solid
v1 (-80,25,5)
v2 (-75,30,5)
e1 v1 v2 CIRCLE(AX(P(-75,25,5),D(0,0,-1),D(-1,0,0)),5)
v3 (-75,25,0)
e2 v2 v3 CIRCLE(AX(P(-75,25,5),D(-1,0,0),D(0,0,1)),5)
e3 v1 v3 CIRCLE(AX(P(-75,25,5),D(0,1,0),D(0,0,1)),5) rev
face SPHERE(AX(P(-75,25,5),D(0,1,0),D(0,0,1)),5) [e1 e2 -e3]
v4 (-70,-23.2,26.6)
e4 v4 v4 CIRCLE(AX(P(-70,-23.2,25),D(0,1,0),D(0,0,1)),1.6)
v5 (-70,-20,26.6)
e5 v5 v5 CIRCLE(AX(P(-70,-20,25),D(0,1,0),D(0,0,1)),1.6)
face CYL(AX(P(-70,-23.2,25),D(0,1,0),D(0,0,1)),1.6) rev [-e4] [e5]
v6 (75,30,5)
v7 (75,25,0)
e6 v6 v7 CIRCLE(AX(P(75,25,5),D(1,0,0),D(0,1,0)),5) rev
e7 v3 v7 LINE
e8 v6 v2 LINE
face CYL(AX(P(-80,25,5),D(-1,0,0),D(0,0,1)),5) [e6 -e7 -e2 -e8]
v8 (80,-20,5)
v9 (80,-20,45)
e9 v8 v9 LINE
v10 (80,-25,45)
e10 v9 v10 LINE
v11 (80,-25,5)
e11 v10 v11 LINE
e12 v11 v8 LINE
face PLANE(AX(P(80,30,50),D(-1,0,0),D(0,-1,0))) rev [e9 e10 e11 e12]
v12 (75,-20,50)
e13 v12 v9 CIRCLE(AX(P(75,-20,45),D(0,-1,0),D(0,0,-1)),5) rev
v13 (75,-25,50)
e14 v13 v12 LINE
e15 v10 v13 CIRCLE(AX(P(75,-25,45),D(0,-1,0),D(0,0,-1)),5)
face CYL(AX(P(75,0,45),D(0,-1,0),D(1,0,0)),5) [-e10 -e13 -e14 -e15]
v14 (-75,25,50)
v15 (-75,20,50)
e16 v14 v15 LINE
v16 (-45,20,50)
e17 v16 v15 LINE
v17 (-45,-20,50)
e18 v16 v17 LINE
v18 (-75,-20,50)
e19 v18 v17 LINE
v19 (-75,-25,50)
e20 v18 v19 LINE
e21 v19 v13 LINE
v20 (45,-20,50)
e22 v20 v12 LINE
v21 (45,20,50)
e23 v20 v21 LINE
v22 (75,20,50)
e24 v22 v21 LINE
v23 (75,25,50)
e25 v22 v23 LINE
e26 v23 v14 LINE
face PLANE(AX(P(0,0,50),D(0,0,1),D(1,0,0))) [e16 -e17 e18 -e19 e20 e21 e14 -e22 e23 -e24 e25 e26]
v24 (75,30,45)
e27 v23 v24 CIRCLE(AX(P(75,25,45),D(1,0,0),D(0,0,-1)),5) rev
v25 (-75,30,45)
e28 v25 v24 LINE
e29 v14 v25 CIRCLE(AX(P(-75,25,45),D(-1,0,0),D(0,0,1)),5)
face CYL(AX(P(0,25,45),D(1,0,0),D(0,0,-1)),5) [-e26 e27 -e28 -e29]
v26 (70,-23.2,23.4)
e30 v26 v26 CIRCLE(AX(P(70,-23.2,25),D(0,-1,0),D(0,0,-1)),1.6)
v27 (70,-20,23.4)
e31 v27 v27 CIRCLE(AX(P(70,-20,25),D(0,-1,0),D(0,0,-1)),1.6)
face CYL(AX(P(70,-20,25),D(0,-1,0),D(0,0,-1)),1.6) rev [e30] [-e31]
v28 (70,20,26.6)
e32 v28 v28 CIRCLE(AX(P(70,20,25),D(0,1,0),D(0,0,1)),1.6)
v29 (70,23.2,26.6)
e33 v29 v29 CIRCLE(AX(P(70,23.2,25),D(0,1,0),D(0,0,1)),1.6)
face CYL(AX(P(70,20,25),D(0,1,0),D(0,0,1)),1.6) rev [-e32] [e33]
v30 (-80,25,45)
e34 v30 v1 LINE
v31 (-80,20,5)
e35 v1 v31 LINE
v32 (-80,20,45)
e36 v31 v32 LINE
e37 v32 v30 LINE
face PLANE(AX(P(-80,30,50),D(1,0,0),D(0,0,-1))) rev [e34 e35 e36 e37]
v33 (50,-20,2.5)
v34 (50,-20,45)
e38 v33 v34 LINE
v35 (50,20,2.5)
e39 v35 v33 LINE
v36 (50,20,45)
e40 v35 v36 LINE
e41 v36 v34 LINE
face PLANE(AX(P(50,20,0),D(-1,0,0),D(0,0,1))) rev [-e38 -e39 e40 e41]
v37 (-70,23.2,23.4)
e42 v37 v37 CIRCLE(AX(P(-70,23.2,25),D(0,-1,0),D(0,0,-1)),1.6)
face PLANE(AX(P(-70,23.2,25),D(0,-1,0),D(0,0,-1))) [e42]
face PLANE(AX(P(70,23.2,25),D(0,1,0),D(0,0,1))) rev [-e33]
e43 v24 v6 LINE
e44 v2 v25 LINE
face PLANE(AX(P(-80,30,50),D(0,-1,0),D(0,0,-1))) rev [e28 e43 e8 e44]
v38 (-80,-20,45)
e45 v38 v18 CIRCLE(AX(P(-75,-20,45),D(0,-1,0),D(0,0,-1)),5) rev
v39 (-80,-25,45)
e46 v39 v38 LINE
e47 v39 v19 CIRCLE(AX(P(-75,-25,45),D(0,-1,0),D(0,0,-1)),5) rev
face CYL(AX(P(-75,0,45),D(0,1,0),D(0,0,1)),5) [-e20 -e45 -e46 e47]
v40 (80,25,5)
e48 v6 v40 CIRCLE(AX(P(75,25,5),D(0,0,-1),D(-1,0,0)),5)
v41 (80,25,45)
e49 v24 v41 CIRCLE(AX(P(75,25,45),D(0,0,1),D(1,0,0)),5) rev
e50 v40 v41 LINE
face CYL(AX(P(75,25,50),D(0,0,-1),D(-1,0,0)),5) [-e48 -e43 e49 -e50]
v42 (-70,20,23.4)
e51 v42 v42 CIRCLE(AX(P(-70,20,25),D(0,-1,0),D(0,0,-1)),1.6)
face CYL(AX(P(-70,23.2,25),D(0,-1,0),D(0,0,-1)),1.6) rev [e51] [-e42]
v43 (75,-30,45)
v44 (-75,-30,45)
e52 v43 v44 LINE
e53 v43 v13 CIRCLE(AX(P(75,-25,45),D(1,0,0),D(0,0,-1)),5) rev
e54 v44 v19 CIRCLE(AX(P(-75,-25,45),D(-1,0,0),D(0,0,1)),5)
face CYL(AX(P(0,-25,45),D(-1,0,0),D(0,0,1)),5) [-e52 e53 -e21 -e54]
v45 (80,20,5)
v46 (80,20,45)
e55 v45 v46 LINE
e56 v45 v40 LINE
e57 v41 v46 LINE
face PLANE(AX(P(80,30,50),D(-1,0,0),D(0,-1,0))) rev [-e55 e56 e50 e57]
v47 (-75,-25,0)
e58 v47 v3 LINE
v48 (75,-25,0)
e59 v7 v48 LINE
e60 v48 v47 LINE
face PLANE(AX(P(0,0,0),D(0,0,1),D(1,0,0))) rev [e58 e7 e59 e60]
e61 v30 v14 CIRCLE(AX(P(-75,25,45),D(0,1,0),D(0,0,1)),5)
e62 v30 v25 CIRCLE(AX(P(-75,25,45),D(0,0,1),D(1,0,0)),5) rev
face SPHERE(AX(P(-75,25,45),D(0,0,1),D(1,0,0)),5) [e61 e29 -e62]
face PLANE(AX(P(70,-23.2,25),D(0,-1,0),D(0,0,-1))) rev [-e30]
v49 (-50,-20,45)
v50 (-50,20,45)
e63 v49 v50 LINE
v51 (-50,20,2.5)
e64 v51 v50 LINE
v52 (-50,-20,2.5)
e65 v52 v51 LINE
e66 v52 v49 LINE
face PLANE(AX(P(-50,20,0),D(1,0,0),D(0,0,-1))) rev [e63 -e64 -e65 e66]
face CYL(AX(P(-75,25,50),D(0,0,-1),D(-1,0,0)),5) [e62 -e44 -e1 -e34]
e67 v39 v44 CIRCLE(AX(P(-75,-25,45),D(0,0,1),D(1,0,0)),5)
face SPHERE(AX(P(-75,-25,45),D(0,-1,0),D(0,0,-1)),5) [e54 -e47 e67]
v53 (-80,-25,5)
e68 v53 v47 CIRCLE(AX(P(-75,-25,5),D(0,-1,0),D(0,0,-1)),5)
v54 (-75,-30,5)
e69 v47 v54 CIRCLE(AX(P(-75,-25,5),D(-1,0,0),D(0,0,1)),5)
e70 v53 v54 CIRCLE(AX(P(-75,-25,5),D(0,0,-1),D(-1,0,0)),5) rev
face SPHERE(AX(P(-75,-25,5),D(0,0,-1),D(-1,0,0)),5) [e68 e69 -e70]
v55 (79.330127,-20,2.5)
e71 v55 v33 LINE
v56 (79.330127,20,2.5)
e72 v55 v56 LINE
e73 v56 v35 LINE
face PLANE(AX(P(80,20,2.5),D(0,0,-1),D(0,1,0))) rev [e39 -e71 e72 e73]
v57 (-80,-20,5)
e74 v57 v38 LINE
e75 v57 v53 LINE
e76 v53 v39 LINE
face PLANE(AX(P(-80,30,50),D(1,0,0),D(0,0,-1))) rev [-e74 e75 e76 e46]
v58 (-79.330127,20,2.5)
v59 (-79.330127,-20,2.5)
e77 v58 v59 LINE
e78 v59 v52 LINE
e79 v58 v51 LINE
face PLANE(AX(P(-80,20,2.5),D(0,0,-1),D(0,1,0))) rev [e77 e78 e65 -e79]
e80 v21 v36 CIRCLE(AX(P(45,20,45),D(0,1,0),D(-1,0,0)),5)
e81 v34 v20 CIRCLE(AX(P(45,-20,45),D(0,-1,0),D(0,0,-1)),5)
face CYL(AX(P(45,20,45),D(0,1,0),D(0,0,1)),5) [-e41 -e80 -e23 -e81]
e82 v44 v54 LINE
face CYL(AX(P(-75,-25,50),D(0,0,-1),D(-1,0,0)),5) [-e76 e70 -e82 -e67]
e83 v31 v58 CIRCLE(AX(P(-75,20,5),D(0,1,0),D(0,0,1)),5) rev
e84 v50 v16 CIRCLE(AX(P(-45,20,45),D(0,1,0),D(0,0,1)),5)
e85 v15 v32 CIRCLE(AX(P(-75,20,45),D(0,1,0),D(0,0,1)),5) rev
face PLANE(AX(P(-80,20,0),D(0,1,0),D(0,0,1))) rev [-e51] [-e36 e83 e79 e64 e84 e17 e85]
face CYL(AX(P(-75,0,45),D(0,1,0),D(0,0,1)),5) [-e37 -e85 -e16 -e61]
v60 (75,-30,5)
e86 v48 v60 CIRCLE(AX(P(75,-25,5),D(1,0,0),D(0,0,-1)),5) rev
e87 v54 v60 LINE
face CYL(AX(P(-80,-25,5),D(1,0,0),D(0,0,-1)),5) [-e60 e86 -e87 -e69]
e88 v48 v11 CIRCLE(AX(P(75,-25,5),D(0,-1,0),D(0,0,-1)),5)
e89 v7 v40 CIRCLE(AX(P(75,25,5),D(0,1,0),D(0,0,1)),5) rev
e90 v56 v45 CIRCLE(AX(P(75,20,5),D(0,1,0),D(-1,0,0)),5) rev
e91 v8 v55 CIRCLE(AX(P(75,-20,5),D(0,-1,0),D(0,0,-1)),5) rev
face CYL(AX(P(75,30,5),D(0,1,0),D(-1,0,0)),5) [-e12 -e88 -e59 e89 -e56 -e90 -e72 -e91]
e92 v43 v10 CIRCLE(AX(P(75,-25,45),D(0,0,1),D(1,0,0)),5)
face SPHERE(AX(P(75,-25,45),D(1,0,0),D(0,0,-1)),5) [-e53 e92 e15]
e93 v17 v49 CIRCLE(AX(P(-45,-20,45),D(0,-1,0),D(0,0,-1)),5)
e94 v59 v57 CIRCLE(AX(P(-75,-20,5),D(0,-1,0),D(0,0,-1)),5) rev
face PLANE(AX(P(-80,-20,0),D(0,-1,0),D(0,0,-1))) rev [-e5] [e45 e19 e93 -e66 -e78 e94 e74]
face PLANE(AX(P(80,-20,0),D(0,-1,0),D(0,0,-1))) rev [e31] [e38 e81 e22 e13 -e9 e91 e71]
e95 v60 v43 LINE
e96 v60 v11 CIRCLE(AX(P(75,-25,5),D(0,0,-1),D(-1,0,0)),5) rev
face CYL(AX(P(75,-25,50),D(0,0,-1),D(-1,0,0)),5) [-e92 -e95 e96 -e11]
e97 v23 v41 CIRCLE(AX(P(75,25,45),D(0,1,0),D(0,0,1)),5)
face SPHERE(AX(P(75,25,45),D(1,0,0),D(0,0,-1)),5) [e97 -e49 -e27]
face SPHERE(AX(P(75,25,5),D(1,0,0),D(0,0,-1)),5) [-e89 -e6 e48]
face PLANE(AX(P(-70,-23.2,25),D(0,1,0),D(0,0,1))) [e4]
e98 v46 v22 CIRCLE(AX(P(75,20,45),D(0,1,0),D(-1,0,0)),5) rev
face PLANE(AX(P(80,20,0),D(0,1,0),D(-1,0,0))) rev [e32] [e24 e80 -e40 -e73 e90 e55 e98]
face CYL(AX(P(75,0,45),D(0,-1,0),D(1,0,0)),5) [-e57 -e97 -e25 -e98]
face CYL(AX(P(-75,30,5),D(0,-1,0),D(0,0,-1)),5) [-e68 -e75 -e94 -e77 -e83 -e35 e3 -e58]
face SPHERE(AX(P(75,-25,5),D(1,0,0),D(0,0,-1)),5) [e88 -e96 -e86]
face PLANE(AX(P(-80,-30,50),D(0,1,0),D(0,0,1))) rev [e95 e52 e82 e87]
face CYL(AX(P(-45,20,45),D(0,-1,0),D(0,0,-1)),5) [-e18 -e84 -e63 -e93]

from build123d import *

# Parameters (mm, degrees)
SKETCH2_W           = 160
SKETCH2_H           = 60
BOSS_EXTRUDE1_DEPTH = 50
SKETCH4_W           = 30
SKETCH4_H           = 40
CUT_EXTRUDE1_DEPTH  = 99.994949366
SKETCH5_R           = 1.6
CUT_EXTRUDE2_DEPTH  = 3.2
CUT_EXTRUDE3_START  = -3.2
SKETCH6_R           = 1.6
CUT_EXTRUDE3_DEPTH  = 3.2
CUT_EXTRUDE5_START  = -6.8
SKETCH7_R           = 1.6
CUT_EXTRUDE5_DEPTH  = 3.2
CUT_EXTRUDE6_START  = -10
SKETCH8_R           = 1.6
CUT_EXTRUDE6_DEPTH  = 3.2
SKETCH9_W           = 2.5
SKETCH9_H           = 40
BOSS_EXTRUDE2_DEPTH = 30
SKETCH10_W          = 2.5
SKETCH10_H          = 40
BOSS_EXTRUDE3_DEPTH = 30
FILLET1_R           = 5


with BuildPart() as part:
    # Sketch2 → Boss-Extrude1 (new body)
    with BuildSketch(Plane.XY):
        Rectangle(SKETCH2_W, SKETCH2_H)
    extrude(amount=BOSS_EXTRUDE1_DEPTH)

    # Sketch4 → Cut-Extrude1 (cut, through all)
    with BuildSketch(Plane.XY.offset(50)):
        with Locations((65, 0)):
            Rectangle(SKETCH4_W, SKETCH4_H)
        with Locations((-65, 0)):
            Rectangle(SKETCH4_W, SKETCH4_H)
    extrude(amount=-CUT_EXTRUDE1_DEPTH, mode=Mode.SUBTRACT)

    # Sketch5 → Cut-Extrude2 (cut)
    with BuildSketch(Plane(origin=(0, 20, 0), x_dir=(-1, 0, 0), z_dir=(0, -1, 0))):
        with Locations(Location((70, -25, 0), (0, 0, 90))):
            Circle(SKETCH5_R)
    extrude(amount=-CUT_EXTRUDE2_DEPTH, mode=Mode.SUBTRACT)

    # Sketch6 → Cut-Extrude3 (cut)
    with BuildSketch(Plane(origin=(0, -20, 0), x_dir=(1, 0, 0), z_dir=(0, 1, 0)).offset(CUT_EXTRUDE3_START)):
        with Locations(Location((-70, -25, 0), (0, 0, 90))):
            Circle(SKETCH6_R)
    extrude(amount=CUT_EXTRUDE3_DEPTH, mode=Mode.SUBTRACT)

    # Sketch7 → Cut-Extrude5 (cut)
    with BuildSketch(Plane(origin=(0, 30, 0), x_dir=(1, 0, 0), z_dir=(0, 1, 0)).offset(CUT_EXTRUDE5_START)):
        with Locations(Location((70, -25, 0), (0, 0, 270))):
            Circle(SKETCH7_R)
    extrude(amount=-CUT_EXTRUDE5_DEPTH, mode=Mode.SUBTRACT)

    # Sketch8 → Cut-Extrude6 (cut)
    with BuildSketch(Plane.XZ.offset(30).offset(CUT_EXTRUDE6_START)):
        with Locations(Location((70, 25, 0), (0, 0, 90))):
            Circle(SKETCH8_R)
    extrude(amount=CUT_EXTRUDE6_DEPTH, mode=Mode.SUBTRACT)

    # Sketch9 → Boss-Extrude2 (add)
    with BuildSketch(Plane.ZY.offset(50)):
        with Locations((1.25, 0)):
            Rectangle(SKETCH9_W, SKETCH9_H)
    extrude(amount=BOSS_EXTRUDE2_DEPTH)

    # Sketch10 → Boss-Extrude3 (add)
    with BuildSketch(Plane(origin=(50, 0, 0), x_dir=(0, 0, -1), z_dir=(1, 0, 0))):
        with Locations((-1.25, 0)):
            Rectangle(SKETCH10_W, SKETCH10_H)
    extrude(amount=BOSS_EXTRUDE3_DEPTH)

    # Fillet1
    # the kernel refuses this fillet: 5 mm, written as the material it takes off along each edge
    with BuildSketch(Plane(origin=(-75, -25, 45), x_dir=(0, -1, 0), z_dir=(0, 0, 1))) as fillet1_piece_1_section:
        Polygon((0, 0), (FILLET1_R, 0), (FILLET1_R, -FILLET1_R), (0, -FILLET1_R), align=None)
    fillet1_piece_1 = extrude(amount=FILLET1_R, mode=Mode.PRIVATE)
    fillet1_piece_1 = fillet1_piece_1 - Plane(origin=(-75, -25, 45), x_dir=(0.7071067811865475, 0.7071067811865475, 0), z_dir=(0, 0, 1)) * Sphere(FILLET1_R, mode=Mode.PRIVATE)
    add(fillet1_piece_1, mode=Mode.SUBTRACT)
    with BuildSketch(Plane(origin=(-75, 25, 45), x_dir=(0, 0, 1), z_dir=(0, 1, 0))) as fillet1_piece_2_section:
        Polygon((0, 0), (FILLET1_R, 0), (FILLET1_R, -FILLET1_R), (0, -FILLET1_R), align=None)
    fillet1_piece_2 = extrude(amount=FILLET1_R, mode=Mode.PRIVATE)
    fillet1_piece_2 = fillet1_piece_2 - Plane(origin=(-75, 25, 45), x_dir=(0.7071067811865475, 0, -0.7071067811865475), z_dir=(0, 1, 0)) * Sphere(FILLET1_R, mode=Mode.PRIVATE)
    add(fillet1_piece_2, mode=Mode.SUBTRACT)
    with BuildSketch(Plane(origin=(75, 25, 45), x_dir=(0, 0, 1), z_dir=(0, 1, 0))) as fillet1_piece_3_section:
        Polygon((0, 0), (FILLET1_R, 0), (FILLET1_R, FILLET1_R), (0, FILLET1_R), align=None)
    fillet1_piece_3 = extrude(amount=FILLET1_R, mode=Mode.PRIVATE)
    fillet1_piece_3 = fillet1_piece_3 - Plane(origin=(75, 25, 45), x_dir=(-0.7071067811865475, 0, -0.7071067811865475), z_dir=(0, 1, 0)) * Sphere(FILLET1_R, mode=Mode.PRIVATE)
    add(fillet1_piece_3, mode=Mode.SUBTRACT)
    with BuildSketch(Plane(origin=(75, -25, 45), x_dir=(0, -1, 0), z_dir=(0, 0, 1))) as fillet1_piece_4_section:
        Polygon((0, 0), (FILLET1_R, 0), (FILLET1_R, FILLET1_R), (0, FILLET1_R), align=None)
    fillet1_piece_4 = extrude(amount=FILLET1_R, mode=Mode.PRIVATE)
    fillet1_piece_4 = fillet1_piece_4 - Plane(origin=(75, -25, 45), x_dir=(-0.7071067811865476, 0.7071067811865475, 0), z_dir=(0, 0, 1)) * Sphere(FILLET1_R, mode=Mode.PRIVATE)
    add(fillet1_piece_4, mode=Mode.SUBTRACT)
    with BuildSketch(Plane(origin=(75, -25, 5), x_dir=(0, 0, -1), z_dir=(0, -1, 0))) as fillet1_piece_5_section:
        Polygon((0, 0), (FILLET1_R, 0), (FILLET1_R, FILLET1_R), (0, FILLET1_R), align=None)
    fillet1_piece_5 = extrude(amount=FILLET1_R, mode=Mode.PRIVATE)
    fillet1_piece_5 = fillet1_piece_5 - Plane(origin=(75, -25, 5), x_dir=(-0.7071067811865475, 0, 0.7071067811865475), z_dir=(0, -1, 0)) * Sphere(FILLET1_R, mode=Mode.PRIVATE)
    add(fillet1_piece_5, mode=Mode.SUBTRACT)
    with BuildSketch(Plane(origin=(75, 25, 5), x_dir=(0, 0, -1), z_dir=(0, 1, 0))) as fillet1_piece_6_section:
        Polygon((0, 0), (FILLET1_R, 0), (FILLET1_R, -FILLET1_R), (0, -FILLET1_R), align=None)
    fillet1_piece_6 = extrude(amount=FILLET1_R, mode=Mode.PRIVATE)
    fillet1_piece_6 = fillet1_piece_6 - Plane(origin=(75, 25, 5), x_dir=(-0.7071067811865475, 0, 0.7071067811865475), z_dir=(0, 1, 0)) * Sphere(FILLET1_R, mode=Mode.PRIVATE)
    add(fillet1_piece_6, mode=Mode.SUBTRACT)
    with BuildSketch(Plane(origin=(-75, 25, 5), x_dir=(0, 0, -1), z_dir=(0, 1, 0))) as fillet1_piece_7_section:
        Polygon((0, 0), (FILLET1_R, 0), (FILLET1_R, FILLET1_R), (0, FILLET1_R), align=None)
    fillet1_piece_7 = extrude(amount=FILLET1_R, mode=Mode.PRIVATE)
    fillet1_piece_7 = fillet1_piece_7 - Plane(origin=(-75, 25, 5), x_dir=(0.7071067811865475, 0, 0.7071067811865475), z_dir=(0, 1, 0)) * Sphere(FILLET1_R, mode=Mode.PRIVATE)
    add(fillet1_piece_7, mode=Mode.SUBTRACT)
    with BuildSketch(Plane(origin=(-75, -25, 5), x_dir=(0, 0, -1), z_dir=(0, -1, 0))) as fillet1_piece_8_section:
        Polygon((0, 0), (FILLET1_R, 0), (FILLET1_R, -FILLET1_R), (0, -FILLET1_R), align=None)
    fillet1_piece_8 = extrude(amount=FILLET1_R, mode=Mode.PRIVATE)
    fillet1_piece_8 = fillet1_piece_8 - Plane(origin=(-75, -25, 5), x_dir=(0.7071067811865475, 0, 0.7071067811865475), z_dir=(0, -1, 0)) * Sphere(FILLET1_R, mode=Mode.PRIVATE)
    add(fillet1_piece_8, mode=Mode.SUBTRACT)
    with BuildSketch(Plane(origin=(-80, -25, 50), x_dir=(1, 0, 0), z_dir=(0, 1, 0)), Plane(origin=(-80, 7.5, 50), x_dir=(1, 0, 0), z_dir=(0, 1, 0)), Plane(origin=(80, 25, 50), x_dir=(-1, 0, 0), z_dir=(0, -1, 0)), Plane(origin=(80, -7.5, 50), x_dir=(-1, 0, 0), z_dir=(0, -1, 0))) as fillet1_piece_9:
        with BuildLine():
            CenterArc((FILLET1_R, FILLET1_R), FILLET1_R, 180, 90)
            Line((0, FILLET1_R), (0, 0))
            Line((0, 0), (FILLET1_R, 0))
        make_face()
    extrude(amount=17.5, mode=Mode.SUBTRACT)
    with BuildSketch(Plane(origin=(50, 20, 50), x_dir=(-1, 0, 0), z_dir=(0, -1, 0)), Plane(origin=(80, 30, 5), x_dir=(-1, 0, 0), z_dir=(0, 0, 1)), Plane(origin=(-80, -30, 5), x_dir=(1, 0, 0), z_dir=(0, 0, 1))) as fillet1_piece_10:
        with BuildLine():
            CenterArc((FILLET1_R, FILLET1_R), FILLET1_R, 180, 90)
            Line((0, FILLET1_R), (0, 0))
            Line((0, 0), (FILLET1_R, 0))
        make_face()
    extrude(amount=40, mode=Mode.SUBTRACT)
    with BuildSketch(Plane(origin=(80, -30, 5), x_dir=(-1, 0, 0), z_dir=(0, 0, 1)), Plane(origin=(-80, 30, 5), x_dir=(1, 0, 0), z_dir=(0, 0, 1)), Plane(origin=(-50, 20, 50), x_dir=(1, 0, 0), z_dir=(0, -1, 0))) as fillet1_piece_11:
        with BuildLine():
            CenterArc((FILLET1_R, -FILLET1_R), FILLET1_R, 90, 90)
            Line((0, -FILLET1_R), (0, 0))
            Line((0, 0), (FILLET1_R, 0))
        make_face()
    extrude(amount=40, mode=Mode.SUBTRACT)
    with BuildSketch(Plane(origin=(80, -25, 0), x_dir=(-1, 0, 0), z_dir=(0, 1, 0)), Plane(origin=(-80, 25, 0), x_dir=(1, 0, 0), z_dir=(0, -1, 0))) as fillet1_piece_12:
        with BuildLine():
            CenterArc((FILLET1_R, FILLET1_R), FILLET1_R, 180, 90)
            Line((0, FILLET1_R), (0, 0))
            Line((0, 0), (FILLET1_R, 0))
        make_face()
    extrude(amount=50, mode=Mode.SUBTRACT)
    with BuildSketch(Plane(origin=(-75, 30, 0), x_dir=(0, 0, 1), z_dir=(1, 0, 0)), Plane(origin=(75, -30, 0), x_dir=(0, 0, 1), z_dir=(-1, 0, 0)), Plane(origin=(75, -30, 50), x_dir=(0, 1, 0), z_dir=(-1, 0, 0))) as fillet1_piece_13:
        with BuildLine():
            CenterArc((FILLET1_R, FILLET1_R), FILLET1_R, 180, 90)
            Line((0, FILLET1_R), (0, 0))
            Line((0, 0), (FILLET1_R, 0))
        make_face()
    extrude(amount=150, mode=Mode.SUBTRACT)
    with BuildSketch(Plane(origin=(-75, 30, 50), x_dir=(0, 0, -1), z_dir=(1, 0, 0))) as fillet1_piece_14:
        with BuildLine():
            CenterArc((FILLET1_R, -FILLET1_R), FILLET1_R, 90, 90)
            Line((0, -FILLET1_R), (0, 0))
            Line((0, 0), (FILLET1_R, 0))
        make_face()
    extrude(amount=150, mode=Mode.SUBTRACT)


solid = part.part
